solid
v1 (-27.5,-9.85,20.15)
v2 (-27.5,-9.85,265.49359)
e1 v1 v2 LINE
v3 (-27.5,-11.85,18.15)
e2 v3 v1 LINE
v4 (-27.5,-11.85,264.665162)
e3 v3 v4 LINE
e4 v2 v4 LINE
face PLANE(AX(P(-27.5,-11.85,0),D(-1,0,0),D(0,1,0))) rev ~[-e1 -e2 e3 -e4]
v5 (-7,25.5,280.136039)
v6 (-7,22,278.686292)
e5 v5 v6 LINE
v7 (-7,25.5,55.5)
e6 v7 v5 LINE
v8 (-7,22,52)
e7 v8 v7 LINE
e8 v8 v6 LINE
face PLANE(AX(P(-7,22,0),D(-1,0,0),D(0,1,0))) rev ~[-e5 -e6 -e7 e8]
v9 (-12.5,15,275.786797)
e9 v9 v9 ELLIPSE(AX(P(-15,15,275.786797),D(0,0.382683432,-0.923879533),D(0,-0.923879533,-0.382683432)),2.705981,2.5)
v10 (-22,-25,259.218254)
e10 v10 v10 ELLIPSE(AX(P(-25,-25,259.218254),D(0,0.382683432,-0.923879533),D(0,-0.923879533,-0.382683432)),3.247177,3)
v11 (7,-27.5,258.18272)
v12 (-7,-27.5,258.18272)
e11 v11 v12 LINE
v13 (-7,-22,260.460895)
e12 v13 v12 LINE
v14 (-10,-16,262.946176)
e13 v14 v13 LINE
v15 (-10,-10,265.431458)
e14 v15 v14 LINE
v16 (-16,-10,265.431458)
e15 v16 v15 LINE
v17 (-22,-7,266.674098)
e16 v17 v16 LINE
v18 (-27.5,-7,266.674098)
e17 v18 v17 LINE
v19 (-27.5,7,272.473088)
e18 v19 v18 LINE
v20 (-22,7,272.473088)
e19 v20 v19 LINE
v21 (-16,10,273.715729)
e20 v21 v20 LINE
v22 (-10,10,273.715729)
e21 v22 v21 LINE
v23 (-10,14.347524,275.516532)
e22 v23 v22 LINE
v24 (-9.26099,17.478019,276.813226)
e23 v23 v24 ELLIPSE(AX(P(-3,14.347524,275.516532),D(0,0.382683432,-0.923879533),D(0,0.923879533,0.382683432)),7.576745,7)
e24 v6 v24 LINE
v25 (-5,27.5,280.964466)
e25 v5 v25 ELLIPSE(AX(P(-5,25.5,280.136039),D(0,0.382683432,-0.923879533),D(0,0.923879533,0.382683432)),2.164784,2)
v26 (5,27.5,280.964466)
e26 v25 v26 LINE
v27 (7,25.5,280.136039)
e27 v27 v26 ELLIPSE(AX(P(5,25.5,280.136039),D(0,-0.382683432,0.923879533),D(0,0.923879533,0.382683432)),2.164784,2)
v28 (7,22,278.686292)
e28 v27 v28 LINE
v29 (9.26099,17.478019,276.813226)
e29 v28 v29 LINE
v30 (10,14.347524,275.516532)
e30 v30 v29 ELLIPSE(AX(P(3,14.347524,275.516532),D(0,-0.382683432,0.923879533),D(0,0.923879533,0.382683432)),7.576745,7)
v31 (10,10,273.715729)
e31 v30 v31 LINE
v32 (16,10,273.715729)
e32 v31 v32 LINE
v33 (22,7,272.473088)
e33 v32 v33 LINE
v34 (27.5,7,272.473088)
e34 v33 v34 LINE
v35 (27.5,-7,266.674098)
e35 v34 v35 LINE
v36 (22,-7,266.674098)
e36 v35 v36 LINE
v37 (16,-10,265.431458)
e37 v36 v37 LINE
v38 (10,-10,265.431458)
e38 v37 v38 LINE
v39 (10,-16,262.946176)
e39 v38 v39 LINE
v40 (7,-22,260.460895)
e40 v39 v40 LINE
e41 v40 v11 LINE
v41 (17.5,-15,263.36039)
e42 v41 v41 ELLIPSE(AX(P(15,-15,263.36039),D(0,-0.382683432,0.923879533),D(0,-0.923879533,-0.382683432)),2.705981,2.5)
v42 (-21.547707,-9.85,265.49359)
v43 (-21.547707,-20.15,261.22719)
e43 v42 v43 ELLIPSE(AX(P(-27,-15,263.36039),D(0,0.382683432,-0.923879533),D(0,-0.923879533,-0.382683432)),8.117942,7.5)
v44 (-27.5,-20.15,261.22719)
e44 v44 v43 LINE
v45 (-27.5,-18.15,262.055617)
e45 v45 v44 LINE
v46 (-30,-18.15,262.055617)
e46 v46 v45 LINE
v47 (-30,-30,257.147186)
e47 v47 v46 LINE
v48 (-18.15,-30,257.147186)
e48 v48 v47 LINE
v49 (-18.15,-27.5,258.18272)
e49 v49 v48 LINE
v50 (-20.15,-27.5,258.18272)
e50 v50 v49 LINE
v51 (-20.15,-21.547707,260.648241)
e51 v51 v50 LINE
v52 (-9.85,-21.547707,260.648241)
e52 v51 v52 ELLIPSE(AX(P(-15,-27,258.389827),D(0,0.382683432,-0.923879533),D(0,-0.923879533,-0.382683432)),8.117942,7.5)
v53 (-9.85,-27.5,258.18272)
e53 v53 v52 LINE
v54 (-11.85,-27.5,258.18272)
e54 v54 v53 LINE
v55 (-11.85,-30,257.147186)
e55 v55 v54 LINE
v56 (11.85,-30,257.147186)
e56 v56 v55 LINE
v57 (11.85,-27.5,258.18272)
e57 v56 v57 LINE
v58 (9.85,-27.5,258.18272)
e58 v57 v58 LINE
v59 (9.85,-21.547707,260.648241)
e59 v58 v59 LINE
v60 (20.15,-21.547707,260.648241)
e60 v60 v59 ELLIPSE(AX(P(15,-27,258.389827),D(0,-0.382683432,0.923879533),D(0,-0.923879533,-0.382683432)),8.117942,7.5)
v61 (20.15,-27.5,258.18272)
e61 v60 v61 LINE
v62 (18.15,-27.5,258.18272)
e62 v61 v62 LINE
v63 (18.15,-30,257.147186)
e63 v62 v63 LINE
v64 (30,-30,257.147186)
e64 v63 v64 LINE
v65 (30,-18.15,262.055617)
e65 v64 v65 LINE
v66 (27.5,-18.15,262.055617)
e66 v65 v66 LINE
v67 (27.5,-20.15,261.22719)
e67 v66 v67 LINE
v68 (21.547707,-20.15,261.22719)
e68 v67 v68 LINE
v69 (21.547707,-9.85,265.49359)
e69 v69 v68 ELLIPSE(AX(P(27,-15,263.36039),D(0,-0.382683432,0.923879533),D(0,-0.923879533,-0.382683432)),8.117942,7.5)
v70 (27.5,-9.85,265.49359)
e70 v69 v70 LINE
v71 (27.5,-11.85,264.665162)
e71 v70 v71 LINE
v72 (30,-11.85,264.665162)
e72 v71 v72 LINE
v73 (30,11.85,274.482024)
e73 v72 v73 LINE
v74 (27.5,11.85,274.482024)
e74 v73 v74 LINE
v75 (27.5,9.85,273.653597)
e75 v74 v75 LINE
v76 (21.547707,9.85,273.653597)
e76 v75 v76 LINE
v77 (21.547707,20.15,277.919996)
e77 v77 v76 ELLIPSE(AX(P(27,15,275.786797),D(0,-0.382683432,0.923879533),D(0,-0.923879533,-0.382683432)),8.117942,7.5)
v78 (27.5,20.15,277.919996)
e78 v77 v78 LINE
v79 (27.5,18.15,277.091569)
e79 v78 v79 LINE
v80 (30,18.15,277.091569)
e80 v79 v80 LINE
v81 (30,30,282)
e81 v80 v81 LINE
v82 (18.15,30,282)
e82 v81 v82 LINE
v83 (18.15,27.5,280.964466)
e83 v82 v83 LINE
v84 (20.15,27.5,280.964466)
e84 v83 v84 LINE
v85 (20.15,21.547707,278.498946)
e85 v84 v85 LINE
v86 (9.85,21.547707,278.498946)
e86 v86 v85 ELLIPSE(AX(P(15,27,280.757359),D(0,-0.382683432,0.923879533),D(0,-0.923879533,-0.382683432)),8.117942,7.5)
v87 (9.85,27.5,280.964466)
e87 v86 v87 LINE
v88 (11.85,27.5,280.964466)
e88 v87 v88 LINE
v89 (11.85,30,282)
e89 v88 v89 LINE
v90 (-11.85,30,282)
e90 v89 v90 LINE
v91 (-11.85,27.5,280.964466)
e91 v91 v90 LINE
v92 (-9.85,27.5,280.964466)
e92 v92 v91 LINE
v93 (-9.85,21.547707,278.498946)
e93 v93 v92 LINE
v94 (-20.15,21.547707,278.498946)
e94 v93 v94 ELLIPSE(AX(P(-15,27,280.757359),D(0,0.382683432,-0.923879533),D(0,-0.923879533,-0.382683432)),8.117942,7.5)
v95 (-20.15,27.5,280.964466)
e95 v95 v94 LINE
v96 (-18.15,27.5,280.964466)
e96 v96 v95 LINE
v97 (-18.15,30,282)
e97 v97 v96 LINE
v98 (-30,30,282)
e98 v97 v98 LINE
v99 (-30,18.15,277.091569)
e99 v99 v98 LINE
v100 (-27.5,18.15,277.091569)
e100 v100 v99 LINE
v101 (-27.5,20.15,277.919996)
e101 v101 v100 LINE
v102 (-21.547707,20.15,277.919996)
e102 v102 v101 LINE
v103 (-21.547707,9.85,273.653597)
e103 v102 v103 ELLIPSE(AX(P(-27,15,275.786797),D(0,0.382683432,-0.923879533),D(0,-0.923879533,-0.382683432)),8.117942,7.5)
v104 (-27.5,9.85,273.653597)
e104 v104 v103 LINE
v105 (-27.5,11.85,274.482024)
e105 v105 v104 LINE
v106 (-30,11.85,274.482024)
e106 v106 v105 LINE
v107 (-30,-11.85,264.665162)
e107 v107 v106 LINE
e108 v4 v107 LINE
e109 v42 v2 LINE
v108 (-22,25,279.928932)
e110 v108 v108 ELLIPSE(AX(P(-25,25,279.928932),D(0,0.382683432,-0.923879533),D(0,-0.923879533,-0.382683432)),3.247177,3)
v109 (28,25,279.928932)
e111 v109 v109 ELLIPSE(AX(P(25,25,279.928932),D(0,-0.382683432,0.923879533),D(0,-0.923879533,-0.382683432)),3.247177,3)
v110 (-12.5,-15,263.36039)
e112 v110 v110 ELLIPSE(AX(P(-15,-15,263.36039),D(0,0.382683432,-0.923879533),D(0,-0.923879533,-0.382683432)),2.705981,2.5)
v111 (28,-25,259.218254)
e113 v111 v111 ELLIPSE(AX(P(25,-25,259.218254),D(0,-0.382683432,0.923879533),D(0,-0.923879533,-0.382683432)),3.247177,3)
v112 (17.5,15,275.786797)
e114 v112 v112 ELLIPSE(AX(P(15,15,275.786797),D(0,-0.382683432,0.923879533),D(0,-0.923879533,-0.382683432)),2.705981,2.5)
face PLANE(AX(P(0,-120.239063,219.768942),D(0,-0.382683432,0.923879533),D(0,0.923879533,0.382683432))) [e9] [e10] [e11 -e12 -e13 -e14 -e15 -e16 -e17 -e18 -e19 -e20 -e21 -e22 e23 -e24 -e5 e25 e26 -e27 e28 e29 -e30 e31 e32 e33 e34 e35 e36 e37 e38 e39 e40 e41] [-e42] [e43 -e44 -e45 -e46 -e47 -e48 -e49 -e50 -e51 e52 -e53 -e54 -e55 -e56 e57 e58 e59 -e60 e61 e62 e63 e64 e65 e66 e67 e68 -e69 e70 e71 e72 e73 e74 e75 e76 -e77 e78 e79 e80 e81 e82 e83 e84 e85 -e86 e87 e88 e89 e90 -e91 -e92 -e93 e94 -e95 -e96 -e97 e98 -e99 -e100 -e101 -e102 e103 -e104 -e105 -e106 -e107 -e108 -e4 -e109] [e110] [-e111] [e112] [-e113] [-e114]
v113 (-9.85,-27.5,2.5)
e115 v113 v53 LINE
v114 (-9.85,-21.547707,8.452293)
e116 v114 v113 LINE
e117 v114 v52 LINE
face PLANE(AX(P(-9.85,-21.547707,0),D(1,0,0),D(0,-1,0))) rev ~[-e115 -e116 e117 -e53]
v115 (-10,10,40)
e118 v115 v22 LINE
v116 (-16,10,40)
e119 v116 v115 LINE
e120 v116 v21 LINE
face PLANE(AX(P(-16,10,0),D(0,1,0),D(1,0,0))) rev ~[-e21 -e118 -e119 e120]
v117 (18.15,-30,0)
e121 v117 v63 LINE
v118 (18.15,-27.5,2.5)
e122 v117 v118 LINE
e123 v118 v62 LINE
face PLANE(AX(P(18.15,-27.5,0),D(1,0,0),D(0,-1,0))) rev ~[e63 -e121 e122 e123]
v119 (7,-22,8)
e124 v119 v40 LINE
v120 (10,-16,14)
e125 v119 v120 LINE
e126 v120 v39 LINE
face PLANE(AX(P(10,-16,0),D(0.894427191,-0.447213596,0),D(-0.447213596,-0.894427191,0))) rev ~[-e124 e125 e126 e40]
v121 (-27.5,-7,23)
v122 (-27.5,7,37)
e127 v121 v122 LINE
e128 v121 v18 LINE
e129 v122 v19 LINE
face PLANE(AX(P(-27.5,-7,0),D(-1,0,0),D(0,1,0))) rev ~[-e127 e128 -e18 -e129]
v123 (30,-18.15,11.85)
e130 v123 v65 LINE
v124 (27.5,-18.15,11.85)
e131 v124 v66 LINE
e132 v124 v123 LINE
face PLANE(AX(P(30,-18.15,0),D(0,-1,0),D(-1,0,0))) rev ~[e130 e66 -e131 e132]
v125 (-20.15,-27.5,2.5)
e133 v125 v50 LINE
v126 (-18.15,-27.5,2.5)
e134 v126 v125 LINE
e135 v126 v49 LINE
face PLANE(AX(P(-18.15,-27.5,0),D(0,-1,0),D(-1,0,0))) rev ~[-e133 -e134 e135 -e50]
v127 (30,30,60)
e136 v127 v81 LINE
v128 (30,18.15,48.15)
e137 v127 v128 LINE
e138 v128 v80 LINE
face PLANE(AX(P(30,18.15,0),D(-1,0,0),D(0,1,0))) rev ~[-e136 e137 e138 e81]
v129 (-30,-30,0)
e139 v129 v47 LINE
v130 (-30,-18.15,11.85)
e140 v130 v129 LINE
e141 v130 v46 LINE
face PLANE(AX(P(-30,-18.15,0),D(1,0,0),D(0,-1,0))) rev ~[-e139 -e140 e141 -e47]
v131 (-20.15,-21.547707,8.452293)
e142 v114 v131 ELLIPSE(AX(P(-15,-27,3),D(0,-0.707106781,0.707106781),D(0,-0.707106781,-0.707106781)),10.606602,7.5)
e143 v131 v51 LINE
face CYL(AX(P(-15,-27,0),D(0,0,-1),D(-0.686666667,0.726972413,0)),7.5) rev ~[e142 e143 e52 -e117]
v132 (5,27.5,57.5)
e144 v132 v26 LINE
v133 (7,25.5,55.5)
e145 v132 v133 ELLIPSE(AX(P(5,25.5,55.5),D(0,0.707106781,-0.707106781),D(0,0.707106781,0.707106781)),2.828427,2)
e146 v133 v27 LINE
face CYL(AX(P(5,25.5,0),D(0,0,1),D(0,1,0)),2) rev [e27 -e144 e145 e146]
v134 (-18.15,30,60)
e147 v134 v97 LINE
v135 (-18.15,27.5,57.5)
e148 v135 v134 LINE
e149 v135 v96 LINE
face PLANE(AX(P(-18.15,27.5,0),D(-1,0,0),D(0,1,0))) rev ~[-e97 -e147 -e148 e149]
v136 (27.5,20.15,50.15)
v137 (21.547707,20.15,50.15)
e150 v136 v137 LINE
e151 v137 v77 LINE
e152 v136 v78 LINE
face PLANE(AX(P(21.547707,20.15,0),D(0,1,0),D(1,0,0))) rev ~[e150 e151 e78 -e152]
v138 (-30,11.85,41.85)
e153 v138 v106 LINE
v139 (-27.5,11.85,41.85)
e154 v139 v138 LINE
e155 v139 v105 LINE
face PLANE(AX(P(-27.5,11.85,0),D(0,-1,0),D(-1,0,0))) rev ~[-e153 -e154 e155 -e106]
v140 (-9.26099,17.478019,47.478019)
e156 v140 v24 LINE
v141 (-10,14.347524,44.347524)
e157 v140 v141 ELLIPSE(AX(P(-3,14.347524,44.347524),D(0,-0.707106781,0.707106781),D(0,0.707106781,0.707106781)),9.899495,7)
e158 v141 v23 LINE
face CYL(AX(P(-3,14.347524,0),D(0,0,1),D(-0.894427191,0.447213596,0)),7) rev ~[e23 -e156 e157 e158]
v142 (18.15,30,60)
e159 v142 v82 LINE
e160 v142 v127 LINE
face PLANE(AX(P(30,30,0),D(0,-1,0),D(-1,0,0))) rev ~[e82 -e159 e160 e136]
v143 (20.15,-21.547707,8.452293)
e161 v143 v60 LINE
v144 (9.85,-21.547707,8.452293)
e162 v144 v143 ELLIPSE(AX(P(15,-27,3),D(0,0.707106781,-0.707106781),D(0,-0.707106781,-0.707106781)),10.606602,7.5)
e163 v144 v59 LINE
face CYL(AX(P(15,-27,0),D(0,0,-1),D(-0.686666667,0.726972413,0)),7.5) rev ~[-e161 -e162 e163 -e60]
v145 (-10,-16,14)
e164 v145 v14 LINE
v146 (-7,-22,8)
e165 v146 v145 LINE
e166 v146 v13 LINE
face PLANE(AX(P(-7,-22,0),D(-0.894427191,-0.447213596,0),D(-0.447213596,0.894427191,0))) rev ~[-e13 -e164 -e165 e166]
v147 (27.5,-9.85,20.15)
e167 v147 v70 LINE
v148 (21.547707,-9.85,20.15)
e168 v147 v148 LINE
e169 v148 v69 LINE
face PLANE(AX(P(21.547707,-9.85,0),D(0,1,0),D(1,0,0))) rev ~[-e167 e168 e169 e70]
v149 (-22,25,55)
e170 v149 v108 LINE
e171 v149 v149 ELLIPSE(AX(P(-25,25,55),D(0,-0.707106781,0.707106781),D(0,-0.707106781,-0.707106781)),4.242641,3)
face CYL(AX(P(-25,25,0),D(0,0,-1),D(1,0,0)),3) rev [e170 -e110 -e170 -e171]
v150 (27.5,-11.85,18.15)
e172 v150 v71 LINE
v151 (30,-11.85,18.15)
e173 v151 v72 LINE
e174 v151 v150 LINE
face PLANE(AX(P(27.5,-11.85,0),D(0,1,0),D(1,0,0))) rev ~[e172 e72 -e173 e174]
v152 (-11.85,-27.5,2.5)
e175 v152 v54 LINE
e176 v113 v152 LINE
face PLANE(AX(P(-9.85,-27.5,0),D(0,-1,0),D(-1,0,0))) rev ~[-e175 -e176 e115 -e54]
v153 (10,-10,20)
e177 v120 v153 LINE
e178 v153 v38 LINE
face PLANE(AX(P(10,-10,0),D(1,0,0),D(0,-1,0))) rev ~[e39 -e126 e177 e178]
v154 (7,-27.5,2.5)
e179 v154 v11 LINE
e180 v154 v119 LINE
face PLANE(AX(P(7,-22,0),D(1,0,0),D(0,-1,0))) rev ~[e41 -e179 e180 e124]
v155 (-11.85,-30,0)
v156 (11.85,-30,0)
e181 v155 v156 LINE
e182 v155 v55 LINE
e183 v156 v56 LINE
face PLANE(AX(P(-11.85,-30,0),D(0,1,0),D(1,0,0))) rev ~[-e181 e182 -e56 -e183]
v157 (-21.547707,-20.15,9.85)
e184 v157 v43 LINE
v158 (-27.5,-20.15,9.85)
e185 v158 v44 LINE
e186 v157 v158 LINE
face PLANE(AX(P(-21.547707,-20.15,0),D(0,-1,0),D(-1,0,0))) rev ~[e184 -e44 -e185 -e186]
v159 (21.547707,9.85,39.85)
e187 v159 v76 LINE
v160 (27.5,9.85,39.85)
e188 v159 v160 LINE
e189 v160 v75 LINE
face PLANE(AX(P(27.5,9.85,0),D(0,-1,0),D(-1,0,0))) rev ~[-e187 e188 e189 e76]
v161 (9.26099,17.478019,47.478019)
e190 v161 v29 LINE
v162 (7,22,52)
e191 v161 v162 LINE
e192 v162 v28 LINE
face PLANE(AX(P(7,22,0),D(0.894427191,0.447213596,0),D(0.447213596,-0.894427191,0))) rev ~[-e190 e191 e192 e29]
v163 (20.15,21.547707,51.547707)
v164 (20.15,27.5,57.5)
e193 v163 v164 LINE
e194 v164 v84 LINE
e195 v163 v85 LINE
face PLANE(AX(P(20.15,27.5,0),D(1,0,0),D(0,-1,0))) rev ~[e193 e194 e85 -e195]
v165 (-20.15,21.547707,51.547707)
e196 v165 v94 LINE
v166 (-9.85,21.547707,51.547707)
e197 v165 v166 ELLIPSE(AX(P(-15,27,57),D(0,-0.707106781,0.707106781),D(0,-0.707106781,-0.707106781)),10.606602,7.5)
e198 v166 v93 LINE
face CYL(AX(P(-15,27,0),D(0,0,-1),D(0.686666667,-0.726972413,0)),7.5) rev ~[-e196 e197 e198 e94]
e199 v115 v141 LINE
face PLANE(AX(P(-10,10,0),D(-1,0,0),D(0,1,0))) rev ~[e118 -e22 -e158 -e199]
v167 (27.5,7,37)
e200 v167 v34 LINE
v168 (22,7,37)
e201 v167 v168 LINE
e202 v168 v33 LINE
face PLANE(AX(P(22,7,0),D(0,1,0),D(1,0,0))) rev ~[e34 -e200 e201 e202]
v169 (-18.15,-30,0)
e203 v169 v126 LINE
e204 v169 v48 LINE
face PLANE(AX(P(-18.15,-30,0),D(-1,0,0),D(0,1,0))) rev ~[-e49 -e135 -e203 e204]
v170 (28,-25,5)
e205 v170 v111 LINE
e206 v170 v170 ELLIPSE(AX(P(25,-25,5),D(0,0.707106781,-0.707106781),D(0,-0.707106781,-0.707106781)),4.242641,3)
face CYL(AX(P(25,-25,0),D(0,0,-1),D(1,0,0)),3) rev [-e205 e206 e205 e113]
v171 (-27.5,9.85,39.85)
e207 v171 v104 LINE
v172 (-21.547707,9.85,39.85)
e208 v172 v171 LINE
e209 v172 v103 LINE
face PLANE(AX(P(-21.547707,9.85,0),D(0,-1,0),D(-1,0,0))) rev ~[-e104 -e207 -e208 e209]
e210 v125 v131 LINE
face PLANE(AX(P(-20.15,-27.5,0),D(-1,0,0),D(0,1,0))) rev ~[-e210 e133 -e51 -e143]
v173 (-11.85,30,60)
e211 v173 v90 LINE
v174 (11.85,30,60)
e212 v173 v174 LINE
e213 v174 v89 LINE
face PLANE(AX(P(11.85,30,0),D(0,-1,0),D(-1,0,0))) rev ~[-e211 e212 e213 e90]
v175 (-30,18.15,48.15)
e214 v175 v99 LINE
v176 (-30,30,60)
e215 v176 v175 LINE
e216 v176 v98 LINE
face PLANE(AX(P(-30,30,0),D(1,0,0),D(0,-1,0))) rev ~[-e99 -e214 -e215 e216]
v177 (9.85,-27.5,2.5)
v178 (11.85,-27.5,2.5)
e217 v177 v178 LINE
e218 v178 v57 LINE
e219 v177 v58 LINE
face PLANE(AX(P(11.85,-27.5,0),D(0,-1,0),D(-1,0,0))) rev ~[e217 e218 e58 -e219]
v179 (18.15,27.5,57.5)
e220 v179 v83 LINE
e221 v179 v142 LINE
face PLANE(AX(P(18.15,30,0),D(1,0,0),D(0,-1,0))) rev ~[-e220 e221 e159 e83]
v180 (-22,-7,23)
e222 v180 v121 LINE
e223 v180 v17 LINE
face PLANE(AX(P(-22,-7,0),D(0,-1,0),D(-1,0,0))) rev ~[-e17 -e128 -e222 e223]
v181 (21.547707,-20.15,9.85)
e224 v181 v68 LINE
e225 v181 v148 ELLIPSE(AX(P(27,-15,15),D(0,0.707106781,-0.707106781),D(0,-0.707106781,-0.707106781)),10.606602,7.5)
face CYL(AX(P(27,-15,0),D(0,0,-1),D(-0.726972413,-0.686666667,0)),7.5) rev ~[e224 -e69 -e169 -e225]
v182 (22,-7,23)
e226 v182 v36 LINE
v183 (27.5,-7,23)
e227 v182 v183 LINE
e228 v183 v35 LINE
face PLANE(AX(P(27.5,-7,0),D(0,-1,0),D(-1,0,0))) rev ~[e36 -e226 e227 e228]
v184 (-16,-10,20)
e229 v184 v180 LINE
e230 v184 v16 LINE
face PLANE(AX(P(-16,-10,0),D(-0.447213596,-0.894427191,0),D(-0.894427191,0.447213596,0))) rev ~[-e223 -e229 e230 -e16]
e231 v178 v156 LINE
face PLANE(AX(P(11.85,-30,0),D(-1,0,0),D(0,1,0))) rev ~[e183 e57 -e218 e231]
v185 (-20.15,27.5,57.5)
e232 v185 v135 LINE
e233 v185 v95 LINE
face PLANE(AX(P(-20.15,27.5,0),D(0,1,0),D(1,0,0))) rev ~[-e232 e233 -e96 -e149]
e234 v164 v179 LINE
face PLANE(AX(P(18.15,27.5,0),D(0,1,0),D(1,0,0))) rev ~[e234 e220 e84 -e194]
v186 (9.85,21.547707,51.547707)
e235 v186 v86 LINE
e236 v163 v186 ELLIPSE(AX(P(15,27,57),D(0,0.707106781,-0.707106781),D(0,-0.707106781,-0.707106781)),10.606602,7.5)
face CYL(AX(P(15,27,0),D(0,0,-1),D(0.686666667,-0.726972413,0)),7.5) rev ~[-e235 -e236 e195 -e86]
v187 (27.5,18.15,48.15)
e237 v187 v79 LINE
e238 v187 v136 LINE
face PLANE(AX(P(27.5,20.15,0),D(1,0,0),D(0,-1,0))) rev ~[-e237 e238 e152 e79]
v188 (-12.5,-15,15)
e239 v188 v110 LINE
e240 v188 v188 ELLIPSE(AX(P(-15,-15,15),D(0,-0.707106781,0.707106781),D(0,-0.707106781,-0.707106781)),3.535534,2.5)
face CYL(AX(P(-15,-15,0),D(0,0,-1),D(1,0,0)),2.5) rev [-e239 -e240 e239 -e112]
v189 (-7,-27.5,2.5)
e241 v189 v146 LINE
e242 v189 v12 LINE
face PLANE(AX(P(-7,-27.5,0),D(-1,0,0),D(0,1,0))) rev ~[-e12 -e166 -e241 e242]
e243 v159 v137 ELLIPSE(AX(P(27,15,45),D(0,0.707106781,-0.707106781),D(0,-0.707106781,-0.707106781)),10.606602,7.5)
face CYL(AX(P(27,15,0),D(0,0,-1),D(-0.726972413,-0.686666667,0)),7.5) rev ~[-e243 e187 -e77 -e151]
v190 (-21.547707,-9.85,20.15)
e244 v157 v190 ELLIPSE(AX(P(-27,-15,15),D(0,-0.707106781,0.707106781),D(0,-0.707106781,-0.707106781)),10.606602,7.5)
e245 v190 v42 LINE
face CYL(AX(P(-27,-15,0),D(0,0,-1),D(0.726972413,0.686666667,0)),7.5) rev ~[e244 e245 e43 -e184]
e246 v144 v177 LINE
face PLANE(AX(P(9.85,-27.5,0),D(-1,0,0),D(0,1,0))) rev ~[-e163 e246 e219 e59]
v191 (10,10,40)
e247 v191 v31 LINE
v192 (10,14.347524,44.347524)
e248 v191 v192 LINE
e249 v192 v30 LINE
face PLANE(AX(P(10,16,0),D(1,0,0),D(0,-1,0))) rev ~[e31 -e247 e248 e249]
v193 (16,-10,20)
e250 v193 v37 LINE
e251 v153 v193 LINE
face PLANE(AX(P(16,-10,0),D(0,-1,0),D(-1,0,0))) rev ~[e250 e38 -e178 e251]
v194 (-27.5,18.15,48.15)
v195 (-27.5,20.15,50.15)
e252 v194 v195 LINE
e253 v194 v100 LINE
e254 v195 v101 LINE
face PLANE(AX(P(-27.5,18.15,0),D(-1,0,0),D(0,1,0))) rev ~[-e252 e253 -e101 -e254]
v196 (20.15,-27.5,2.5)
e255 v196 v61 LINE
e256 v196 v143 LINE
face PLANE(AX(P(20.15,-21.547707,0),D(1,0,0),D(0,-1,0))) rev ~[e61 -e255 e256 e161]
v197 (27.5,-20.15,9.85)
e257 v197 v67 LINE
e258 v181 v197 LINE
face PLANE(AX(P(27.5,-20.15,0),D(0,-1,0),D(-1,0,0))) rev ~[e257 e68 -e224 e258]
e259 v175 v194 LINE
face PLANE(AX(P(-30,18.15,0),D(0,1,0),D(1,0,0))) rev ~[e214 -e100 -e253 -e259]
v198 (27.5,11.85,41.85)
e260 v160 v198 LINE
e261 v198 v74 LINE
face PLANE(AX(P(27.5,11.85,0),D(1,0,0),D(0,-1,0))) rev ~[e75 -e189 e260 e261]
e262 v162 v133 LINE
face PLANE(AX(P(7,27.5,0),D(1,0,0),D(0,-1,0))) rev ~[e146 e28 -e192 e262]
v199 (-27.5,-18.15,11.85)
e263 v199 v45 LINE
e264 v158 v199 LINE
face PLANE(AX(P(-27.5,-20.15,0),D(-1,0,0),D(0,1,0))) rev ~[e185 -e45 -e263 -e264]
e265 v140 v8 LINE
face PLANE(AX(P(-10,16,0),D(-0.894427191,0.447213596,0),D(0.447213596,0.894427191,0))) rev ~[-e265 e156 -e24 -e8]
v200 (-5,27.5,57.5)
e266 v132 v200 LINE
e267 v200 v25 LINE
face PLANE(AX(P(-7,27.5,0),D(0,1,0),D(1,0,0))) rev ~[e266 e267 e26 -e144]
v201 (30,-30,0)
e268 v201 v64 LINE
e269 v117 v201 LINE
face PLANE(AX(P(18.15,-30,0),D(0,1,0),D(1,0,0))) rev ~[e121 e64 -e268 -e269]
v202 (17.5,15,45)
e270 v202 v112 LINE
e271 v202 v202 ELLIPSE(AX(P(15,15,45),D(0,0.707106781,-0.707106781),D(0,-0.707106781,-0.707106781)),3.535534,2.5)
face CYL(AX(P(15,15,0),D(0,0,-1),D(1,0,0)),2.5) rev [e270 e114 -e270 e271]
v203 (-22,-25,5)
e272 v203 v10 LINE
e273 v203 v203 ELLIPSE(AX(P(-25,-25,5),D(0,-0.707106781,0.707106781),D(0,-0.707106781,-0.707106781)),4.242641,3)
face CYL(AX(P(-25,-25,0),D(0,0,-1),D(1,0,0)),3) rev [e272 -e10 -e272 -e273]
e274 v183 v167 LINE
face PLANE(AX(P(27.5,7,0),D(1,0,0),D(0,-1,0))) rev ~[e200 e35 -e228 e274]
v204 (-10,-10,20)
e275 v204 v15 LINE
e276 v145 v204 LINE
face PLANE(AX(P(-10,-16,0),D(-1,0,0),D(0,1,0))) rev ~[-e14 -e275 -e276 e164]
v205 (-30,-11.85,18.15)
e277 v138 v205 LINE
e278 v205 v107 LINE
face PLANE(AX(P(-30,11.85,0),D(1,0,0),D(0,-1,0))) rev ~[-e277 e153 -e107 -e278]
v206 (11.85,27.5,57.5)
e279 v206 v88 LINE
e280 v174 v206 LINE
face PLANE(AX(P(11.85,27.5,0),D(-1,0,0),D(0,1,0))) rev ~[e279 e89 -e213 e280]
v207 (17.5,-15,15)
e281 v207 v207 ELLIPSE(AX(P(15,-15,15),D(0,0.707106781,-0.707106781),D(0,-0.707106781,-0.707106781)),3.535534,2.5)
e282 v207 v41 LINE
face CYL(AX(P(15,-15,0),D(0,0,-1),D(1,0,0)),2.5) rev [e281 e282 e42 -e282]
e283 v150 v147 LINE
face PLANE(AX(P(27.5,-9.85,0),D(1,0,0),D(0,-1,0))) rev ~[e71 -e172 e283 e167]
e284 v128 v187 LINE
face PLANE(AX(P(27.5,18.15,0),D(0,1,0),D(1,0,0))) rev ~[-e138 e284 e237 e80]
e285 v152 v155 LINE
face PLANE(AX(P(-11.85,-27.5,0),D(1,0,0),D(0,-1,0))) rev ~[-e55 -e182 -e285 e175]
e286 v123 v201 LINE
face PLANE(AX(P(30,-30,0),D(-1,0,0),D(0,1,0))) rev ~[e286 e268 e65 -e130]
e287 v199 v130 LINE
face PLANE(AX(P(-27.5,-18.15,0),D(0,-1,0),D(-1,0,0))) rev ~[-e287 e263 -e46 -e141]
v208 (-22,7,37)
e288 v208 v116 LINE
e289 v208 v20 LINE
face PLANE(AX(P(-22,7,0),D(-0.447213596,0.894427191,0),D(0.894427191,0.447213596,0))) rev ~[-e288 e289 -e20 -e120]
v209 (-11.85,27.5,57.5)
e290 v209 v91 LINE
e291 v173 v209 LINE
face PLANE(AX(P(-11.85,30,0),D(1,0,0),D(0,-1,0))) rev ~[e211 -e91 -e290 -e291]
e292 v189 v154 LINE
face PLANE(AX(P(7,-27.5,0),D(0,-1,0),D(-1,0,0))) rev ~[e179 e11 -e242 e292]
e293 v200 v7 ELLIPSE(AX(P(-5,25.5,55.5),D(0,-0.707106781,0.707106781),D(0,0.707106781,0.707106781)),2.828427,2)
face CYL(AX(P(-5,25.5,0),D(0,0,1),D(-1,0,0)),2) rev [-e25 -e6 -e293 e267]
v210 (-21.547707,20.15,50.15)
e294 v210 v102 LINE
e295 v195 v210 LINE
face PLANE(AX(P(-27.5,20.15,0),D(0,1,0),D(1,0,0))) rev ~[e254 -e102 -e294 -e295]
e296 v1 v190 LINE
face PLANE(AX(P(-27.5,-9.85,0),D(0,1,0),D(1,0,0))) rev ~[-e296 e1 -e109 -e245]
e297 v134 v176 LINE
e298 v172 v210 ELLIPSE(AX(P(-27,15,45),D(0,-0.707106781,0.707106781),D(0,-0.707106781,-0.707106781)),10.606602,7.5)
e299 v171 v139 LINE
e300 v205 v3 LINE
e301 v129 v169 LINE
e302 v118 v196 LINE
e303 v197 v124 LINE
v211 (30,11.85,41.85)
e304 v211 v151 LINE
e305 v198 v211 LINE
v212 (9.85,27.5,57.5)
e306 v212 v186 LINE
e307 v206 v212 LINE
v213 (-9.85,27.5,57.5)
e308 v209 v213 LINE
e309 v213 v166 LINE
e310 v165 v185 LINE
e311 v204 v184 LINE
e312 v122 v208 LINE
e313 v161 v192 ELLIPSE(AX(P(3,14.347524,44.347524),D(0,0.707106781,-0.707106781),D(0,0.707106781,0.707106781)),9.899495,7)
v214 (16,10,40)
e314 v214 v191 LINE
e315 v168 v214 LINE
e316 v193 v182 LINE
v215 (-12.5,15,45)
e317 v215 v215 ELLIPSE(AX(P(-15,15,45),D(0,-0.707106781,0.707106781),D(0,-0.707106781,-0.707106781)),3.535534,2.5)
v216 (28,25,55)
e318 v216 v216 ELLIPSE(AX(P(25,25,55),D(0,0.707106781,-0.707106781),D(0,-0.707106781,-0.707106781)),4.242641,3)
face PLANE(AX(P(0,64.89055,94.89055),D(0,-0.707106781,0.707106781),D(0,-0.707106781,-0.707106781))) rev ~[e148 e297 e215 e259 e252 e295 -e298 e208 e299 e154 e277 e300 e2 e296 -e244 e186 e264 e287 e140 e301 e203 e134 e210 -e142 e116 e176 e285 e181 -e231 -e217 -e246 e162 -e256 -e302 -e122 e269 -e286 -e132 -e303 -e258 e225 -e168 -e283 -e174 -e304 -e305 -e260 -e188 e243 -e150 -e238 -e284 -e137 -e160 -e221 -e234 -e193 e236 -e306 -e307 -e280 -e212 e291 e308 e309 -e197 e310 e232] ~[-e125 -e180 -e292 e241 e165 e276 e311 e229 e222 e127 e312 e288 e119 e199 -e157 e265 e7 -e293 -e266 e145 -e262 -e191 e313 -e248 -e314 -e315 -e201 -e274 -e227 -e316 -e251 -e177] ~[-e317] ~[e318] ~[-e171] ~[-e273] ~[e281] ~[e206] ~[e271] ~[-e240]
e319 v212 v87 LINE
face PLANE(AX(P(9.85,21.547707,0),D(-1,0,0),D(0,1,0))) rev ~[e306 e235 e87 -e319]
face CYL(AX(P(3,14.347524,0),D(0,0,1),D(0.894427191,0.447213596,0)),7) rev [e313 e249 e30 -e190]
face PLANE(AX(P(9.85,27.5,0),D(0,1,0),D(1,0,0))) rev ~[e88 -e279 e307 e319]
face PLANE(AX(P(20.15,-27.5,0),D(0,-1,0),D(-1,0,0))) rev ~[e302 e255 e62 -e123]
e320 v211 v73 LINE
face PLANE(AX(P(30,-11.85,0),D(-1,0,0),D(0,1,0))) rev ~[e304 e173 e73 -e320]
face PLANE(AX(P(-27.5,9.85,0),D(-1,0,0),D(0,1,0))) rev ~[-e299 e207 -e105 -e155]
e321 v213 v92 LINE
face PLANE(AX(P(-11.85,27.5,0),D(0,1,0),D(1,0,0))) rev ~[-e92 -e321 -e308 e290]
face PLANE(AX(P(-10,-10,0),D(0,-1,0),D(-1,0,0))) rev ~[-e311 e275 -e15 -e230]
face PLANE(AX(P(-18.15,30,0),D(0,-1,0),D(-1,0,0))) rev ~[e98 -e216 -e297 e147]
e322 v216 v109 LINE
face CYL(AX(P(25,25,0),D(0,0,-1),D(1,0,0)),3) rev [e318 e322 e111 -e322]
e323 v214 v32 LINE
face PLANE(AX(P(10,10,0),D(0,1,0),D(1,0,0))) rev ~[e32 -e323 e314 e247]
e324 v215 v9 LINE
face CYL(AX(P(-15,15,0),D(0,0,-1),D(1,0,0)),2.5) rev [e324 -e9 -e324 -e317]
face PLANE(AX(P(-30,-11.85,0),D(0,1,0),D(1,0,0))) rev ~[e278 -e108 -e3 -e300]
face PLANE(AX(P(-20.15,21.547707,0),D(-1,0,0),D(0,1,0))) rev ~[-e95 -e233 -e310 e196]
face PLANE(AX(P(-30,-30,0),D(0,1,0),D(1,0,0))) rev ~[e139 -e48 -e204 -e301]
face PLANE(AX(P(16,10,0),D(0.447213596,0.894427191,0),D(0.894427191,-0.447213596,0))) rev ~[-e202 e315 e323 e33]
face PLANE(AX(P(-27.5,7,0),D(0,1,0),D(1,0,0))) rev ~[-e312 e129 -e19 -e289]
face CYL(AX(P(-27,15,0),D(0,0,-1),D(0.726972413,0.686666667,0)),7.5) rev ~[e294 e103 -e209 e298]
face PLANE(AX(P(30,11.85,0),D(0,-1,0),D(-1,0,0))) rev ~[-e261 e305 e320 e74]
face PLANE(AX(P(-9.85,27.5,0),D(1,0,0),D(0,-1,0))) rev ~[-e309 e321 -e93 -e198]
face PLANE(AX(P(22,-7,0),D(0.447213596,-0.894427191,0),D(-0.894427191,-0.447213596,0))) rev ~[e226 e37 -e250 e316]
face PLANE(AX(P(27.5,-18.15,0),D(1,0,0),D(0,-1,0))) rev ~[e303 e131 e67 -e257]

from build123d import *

# Parameters (mm, degrees)
F0_R          = 3
F0_R_2        = 2.5
F1_DEPTH      = 282
F2_R          = 2
F3_R          = 7
F6_DEPTH      = 30
F6_DEPTH_BACK = 30


# Not quite as in the source:
# - a feature names something its author has since deleted; it is built from what else it names


with BuildPart() as f1:
    # F0 (on Top) → F1 (new body)
    with BuildSketch(Plane.XY):
        with BuildLine():
            Line((18.15, -30), (30, -30))
            Line((30, -30), (30, -18.15))
            Line((30, -18.15), (27.5, -18.15))
            Line((27.5, -18.15), (27.5, -20.15))
            Line((27.5, -20.15), (21.5477069044, -20.15))
            ThreePointArc((21.5477069044, -20.15), (19.5, -15), (21.5477069044, -9.85))
            Line((21.5477069044, -9.85), (27.5, -9.85))
            Line((27.5, -9.85), (27.5, -11.85))
            Line((27.5, -11.85), (30, -11.85))
            Line((30, -11.85), (30, 11.85))
            Line((30, 11.85), (27.5, 11.85))
            Line((27.5, 11.85), (27.5, 9.85))
            Line((27.5, 9.85), (21.5477069044, 9.85))
            ThreePointArc((21.5477069044, 9.85), (19.5, 15), (21.5477069044, 20.15))
            Line((21.5477069044, 20.15), (27.5, 20.15))
            Line((27.5, 20.15), (27.5, 18.15))
            Line((27.5, 18.15), (30, 18.15))
            Line((30, 18.15), (30, 30))
            Line((30, 30), (18.15, 30))
            Line((18.15, 30), (18.15, 27.5))
            Line((18.15, 27.5), (20.15, 27.5))
            Line((20.15, 27.5), (20.15, 21.5477069044))
            ThreePointArc((20.15, 21.5477069044), (15, 19.5), (9.85, 21.5477069044))
            Line((9.85, 21.5477069044), (9.85, 27.5))
            Line((9.85, 27.5), (11.85, 27.5))
            Line((11.85, 27.5), (11.85, 30))
            Line((11.85, 30), (-11.85, 30))
            Line((-11.85, 30), (-11.85, 27.5))
            Line((-11.85, 27.5), (-9.85, 27.5))
            Line((-9.85, 27.5), (-9.85, 21.5477069044))
            ThreePointArc((-9.85, 21.5477069044), (-15, 19.5), (-20.15, 21.5477069044))
            Line((-20.15, 21.5477069044), (-20.15, 27.5))
            Line((-20.15, 27.5), (-18.15, 27.5))
            Line((-18.15, 27.5), (-18.15, 30))
            Line((-18.15, 30), (-30, 30))
            Line((-30, 30), (-30, 18.15))
            Line((-30, 18.15), (-27.5, 18.15))
            Line((-27.5, 18.15), (-27.5, 20.15))
            Line((-27.5, 20.15), (-21.5477069044, 20.15))
            ThreePointArc((-21.5477069044, 20.15), (-19.5, 15), (-21.5477069044, 9.85))
            Line((-21.5477069044, 9.85), (-27.5, 9.85))
            Line((-27.5, 9.85), (-27.5, 11.85))
            Line((-27.5, 11.85), (-30, 11.85))
            Line((-30, 11.85), (-30, -11.85))
            Line((-30, -11.85), (-27.5, -11.85))
            Line((-27.5, -11.85), (-27.5, -9.85))
            Line((-27.5, -9.85), (-21.5477069044, -9.85))
            ThreePointArc((-21.5477069044, -9.85), (-19.5, -15), (-21.5477069044, -20.15))
            Line((-21.5477069044, -20.15), (-27.5, -20.15))
            Line((-27.5, -20.15), (-27.5, -18.15))
            Line((-27.5, -18.15), (-30, -18.15))
            Line((-30, -18.15), (-30, -30))
            Line((-30, -30), (-18.15, -30))
            Line((-18.15, -30), (-18.15, -27.5))
            Line((-18.15, -27.5), (-20.15, -27.5))
            Line((-20.15, -27.5), (-20.15, -21.5477069044))
            ThreePointArc((-20.15, -21.5477069044), (-15, -19.5), (-9.85, -21.5477069044))
            Line((-9.85, -21.5477069044), (-9.85, -27.5))
            Line((-9.85, -27.5), (-11.85, -27.5))
            Line((-11.85, -27.5), (-11.85, -30))
            Line((-11.85, -30), (11.85, -30))
            Line((11.85, -30), (11.85, -27.5))
            Line((11.85, -27.5), (9.85, -27.5))
            Line((9.85, -27.5), (9.85, -21.5477069044))
            ThreePointArc((9.85, -21.5477069044), (15, -19.5), (20.15, -21.5477069044))
            Line((20.15, -21.5477069044), (20.15, -27.5))
            Line((20.15, -27.5), (18.15, -27.5))
            Line((18.15, -27.5), (18.15, -30))
        make_face()
        with Locations((-25, -25)):
            Circle(F0_R, mode=Mode.SUBTRACT)
        with Locations((-15, -15)):
            Circle(F0_R_2, mode=Mode.SUBTRACT)
        with Locations((25, -25)):
            Circle(F0_R, mode=Mode.SUBTRACT)
        with Locations((15, -15)):
            Circle(F0_R_2, mode=Mode.SUBTRACT)
        with Locations((-25, 25)):
            Circle(F0_R, mode=Mode.SUBTRACT)
        with Locations((-15, 15)):
            Circle(F0_R_2, mode=Mode.SUBTRACT)
        Polygon((-7, 22), (-7, 27.5), (0, 27.5), (7, 27.5), (7, 22), (10, 16), (10, 10), (16, 10), (22, 7), (27.5, 7), (27.5, 0), (27.5, -7), (22, -7), (16, -10), (10, -10), (10, -16), (7, -22), (7, -27.5), (0, -27.5), (-7, -27.5), (-7, -22), (-10, -16), (-10, -10), (-16, -10), (-22, -7), (-27.5, -7), (-27.5, 0), (-27.5, 7), (-22, 7), (-16, 10), (-10, 10), (-10, 16), align=None, mode=Mode.SUBTRACT)
        with Locations((15, 15)):
            Circle(F0_R_2, mode=Mode.SUBTRACT)
        with Locations((25, 25)):
            Circle(F0_R, mode=Mode.SUBTRACT)
    extrude(amount=F1_DEPTH)

    # F2
    f2_edges = [f1.edges().sort_by_distance(p)[0] for p in [
        (-7, 27.5, 141),
        (7, 27.5, 141),
    ]]
    fillet(f2_edges, radius=F2_R)

    # F3
    f3_edges = [f1.edges().sort_by_distance(p)[0] for p in [
        (-10, 16, 141),
        (10, 16, 141),
    ]]
    fillet(f3_edges, radius=F3_R)

    # F5 (on Right) → F6 (cut, two sides)
    with BuildSketch(Plane.YZ) as f6_sk:
        Polygon((115.2614038106, 44.5196963257), (64.8905500682, 94.8905500682), (-30, 0), (20.3708537424, -50.3708537424), align=None)
        Polygon((30, 282), (-7.7241411908, 373.0741332917), (-157.9632044753, 310.843075681), (-120.2390632845, 219.7689423893), align=None)
    extrude(amount=F6_DEPTH, mode=Mode.SUBTRACT)
    extrude(f6_sk.sketch, amount=-F6_DEPTH_BACK, mode=Mode.SUBTRACT)


solid = f1.part
